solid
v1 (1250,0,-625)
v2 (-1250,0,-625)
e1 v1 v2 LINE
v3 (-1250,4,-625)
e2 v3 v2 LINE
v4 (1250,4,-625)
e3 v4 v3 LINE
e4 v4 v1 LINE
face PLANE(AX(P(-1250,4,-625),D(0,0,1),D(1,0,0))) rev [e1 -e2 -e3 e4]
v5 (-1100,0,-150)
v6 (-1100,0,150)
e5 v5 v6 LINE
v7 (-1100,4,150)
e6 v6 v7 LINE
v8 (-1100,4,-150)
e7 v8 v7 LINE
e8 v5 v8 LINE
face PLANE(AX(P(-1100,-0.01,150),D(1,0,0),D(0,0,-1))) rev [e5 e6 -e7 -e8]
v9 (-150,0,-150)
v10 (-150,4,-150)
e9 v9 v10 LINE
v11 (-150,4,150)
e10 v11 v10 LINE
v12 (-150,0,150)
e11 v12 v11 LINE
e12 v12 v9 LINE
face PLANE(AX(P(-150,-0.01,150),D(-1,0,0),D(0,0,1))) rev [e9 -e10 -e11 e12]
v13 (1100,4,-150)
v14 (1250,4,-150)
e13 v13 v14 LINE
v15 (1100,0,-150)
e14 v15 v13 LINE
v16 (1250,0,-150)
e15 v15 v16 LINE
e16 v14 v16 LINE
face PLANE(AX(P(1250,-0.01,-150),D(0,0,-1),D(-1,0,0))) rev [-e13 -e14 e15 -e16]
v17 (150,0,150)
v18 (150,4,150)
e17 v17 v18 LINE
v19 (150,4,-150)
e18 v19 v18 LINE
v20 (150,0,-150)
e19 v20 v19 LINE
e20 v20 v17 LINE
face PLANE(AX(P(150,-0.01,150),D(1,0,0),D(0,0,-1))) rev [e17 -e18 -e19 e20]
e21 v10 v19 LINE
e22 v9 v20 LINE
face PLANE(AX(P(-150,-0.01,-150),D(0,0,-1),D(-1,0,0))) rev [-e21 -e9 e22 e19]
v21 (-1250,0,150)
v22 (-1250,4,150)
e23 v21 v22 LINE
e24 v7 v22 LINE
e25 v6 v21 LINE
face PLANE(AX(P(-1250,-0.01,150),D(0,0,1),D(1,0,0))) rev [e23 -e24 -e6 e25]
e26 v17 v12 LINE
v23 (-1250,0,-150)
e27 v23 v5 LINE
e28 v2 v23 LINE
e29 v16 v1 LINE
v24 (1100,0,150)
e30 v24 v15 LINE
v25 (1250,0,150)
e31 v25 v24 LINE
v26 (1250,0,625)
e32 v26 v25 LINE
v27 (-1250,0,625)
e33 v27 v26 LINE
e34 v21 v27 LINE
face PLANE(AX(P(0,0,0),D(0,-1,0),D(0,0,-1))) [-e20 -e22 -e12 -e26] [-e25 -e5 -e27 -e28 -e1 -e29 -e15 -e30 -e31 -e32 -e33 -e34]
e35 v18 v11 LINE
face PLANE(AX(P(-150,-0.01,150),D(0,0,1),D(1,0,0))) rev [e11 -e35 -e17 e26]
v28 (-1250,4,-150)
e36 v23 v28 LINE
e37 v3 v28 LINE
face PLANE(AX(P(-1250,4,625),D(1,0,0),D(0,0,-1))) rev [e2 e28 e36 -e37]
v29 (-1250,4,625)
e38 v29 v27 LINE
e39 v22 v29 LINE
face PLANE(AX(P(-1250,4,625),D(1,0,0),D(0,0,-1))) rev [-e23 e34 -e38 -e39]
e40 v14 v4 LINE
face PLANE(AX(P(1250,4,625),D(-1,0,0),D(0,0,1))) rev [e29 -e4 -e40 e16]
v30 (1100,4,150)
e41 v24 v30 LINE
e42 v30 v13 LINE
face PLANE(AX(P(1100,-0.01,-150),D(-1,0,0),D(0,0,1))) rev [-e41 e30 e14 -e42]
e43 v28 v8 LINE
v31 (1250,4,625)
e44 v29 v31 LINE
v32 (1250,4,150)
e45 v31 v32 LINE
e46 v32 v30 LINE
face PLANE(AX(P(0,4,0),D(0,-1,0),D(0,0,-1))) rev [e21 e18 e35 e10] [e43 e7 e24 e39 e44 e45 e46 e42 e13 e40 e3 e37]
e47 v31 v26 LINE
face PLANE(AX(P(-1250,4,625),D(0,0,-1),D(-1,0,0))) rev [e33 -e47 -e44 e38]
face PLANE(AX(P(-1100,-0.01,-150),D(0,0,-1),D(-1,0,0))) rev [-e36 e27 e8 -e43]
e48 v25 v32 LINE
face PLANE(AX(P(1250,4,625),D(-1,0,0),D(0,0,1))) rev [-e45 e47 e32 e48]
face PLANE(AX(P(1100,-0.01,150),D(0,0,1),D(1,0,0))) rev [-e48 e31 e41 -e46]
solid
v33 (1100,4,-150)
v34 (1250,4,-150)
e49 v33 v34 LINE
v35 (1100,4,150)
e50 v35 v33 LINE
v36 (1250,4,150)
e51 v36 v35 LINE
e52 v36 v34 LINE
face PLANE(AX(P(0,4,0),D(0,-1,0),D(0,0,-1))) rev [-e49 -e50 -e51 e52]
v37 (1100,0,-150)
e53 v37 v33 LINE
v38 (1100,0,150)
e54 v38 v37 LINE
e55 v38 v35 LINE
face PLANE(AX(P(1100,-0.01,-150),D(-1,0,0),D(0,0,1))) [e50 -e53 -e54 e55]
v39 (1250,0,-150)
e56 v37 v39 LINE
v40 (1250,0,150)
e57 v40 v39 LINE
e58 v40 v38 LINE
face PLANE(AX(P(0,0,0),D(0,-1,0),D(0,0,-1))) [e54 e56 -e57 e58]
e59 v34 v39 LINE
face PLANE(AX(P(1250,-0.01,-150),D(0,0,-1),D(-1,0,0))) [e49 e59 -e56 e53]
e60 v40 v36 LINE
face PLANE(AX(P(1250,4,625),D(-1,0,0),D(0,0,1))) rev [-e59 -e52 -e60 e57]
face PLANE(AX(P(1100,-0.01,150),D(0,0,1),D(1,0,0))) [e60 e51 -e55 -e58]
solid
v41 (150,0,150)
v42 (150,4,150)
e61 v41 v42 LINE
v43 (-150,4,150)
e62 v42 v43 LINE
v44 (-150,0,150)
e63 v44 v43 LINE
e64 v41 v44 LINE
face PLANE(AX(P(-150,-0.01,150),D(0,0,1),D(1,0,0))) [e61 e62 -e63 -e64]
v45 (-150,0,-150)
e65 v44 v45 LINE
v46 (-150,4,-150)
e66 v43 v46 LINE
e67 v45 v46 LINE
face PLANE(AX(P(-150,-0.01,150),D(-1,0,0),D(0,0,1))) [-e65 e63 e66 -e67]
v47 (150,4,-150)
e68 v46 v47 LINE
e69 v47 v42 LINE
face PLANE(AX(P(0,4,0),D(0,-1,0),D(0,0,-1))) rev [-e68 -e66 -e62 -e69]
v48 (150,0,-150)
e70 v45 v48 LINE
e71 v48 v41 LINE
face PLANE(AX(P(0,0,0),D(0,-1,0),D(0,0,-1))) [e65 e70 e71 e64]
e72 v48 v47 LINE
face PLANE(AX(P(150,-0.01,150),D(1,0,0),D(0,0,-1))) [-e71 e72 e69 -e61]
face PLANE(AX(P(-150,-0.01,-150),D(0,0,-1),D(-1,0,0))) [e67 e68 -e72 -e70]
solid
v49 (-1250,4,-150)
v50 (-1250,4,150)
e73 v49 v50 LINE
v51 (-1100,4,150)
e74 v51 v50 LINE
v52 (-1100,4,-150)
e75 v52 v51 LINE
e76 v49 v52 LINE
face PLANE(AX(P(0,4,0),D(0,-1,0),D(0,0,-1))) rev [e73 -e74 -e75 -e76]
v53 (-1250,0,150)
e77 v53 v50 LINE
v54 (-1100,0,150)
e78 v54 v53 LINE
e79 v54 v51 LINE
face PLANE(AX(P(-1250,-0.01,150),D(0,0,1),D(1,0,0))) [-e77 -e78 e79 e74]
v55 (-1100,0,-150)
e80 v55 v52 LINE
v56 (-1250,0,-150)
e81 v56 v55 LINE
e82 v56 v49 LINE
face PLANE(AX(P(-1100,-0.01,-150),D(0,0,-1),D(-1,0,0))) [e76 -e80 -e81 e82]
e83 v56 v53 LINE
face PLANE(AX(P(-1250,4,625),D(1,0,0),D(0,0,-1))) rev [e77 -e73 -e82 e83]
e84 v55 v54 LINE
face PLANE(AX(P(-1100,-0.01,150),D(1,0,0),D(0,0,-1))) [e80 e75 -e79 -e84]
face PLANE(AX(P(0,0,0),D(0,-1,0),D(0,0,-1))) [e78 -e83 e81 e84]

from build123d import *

# Parameters (mm, degrees)
SKETCH1_W              = 2500
SKETCH1_H              = 1250
BOSS_EXTRUDE1_DEPTH    = 4
SPLIT1_SURFACE_1_BACK  = 2796.088
SPLIT1_SURFACE_1_DEPTH = 5592.176
SPLIT1_SURFACE_2_BACK  = 2796.088
SPLIT1_SURFACE_2_DEPTH = 5592.176
SPLIT2_START           = -150
SPLIT2_OUTLINE_W       = 150
SPLIT2_OUTLINE_H       = 4
SPLIT2_DEPTH           = 300
SPLIT2_2_OUTLINE_W     = 150
SPLIT2_2_OUTLINE_H     = 4
SPLIT2_2_DEPTH         = 300
SPLIT2_3_OUTLINE_W     = 150
SPLIT2_3_OUTLINE_H     = 4
SPLIT2_3_DEPTH         = 300


# Read off the part's stored shape, not the designer's step: Split2
with BuildPart() as part:
    # Sketch1 → Boss-Extrude1 (new body)
    with BuildSketch(Plane(origin=(0, 0, 0), x_dir=(1, 0, 0), z_dir=(0, 1, 0))):
        Rectangle(SKETCH1_W, SKETCH1_H)
    extrude(amount=BOSS_EXTRUDE1_DEPTH)


with BuildPart() as body_2:
    # Split1: the piece behind the surface
    add(part.part)
    # Split1 surface: a surface, the sketch's curves swept straight by 5592.176 mm
    with BuildLine(Plane(origin=(0, 4, 0), x_dir=(1, 0, 0), z_dir=(0, 1, 0)).offset(-SPLIT1_SURFACE_1_BACK), mode=Mode.PRIVATE) as split1_surface_1_path:
        Line((-150, -150), (150, -150))
        Line((150, -150), (150, 150))
        Line((150, 150), (-150, 150))
        Line((-150, 150), (-150, -150))
    split1_surface_1 = Shell.extrude(split1_surface_1_path.wire(), (0 * SPLIT1_SURFACE_1_DEPTH, 1 * SPLIT1_SURFACE_1_DEPTH, 0 * SPLIT1_SURFACE_1_DEPTH))
    split(bisect_by=split1_surface_1, keep=Keep.BOTTOM)

    # Split2 2 outline → Split2 2 (cut)
    with BuildSketch(Plane.XY.offset(SPLIT2_START)):
        with Locations((-1175, 2)):
            Rectangle(SPLIT2_2_OUTLINE_W, SPLIT2_2_OUTLINE_H)
        with Locations((1175, 2)):
            Rectangle(SPLIT2_2_OUTLINE_W, SPLIT2_2_OUTLINE_H)
    extrude(amount=SPLIT2_2_DEPTH, mode=Mode.SUBTRACT)


with BuildPart() as part_1:
    add(part.part)

    # Split1: split by a surface, the side it looks to stays
    # Split1 surface: a surface, the sketch's curves swept straight by 5592.176 mm
    with BuildLine(Plane(origin=(0, 4, 0), x_dir=(1, 0, 0), z_dir=(0, 1, 0)).offset(-SPLIT1_SURFACE_2_BACK), mode=Mode.PRIVATE) as split1_surface_2_path:
        Line((-150, -150), (150, -150))
        Line((150, -150), (150, 150))
        Line((150, 150), (-150, 150))
        Line((-150, 150), (-150, -150))
    split1_surface_2 = Shell.extrude(split1_surface_2_path.wire(), (0 * SPLIT1_SURFACE_2_DEPTH, 1 * SPLIT1_SURFACE_2_DEPTH, 0 * SPLIT1_SURFACE_2_DEPTH))
    split(bisect_by=split1_surface_2, keep=Keep.TOP)


with BuildPart() as body_3:
    # Split2 outline → Split2 (new body)
    with BuildSketch(Plane.XY.offset(SPLIT2_START)):
        with Locations((-1175, 2)):
            Rectangle(SPLIT2_OUTLINE_W, SPLIT2_OUTLINE_H)
    extrude(amount=SPLIT2_DEPTH)


with BuildPart() as body_4:
    # Split2 3 outline → Split2 3 (new body)
    with BuildSketch(Plane.XY.offset(SPLIT2_START)):
        with Locations((1175, 2)):
            Rectangle(SPLIT2_3_OUTLINE_W, SPLIT2_3_OUTLINE_H)
    extrude(amount=SPLIT2_3_DEPTH)


solid = Compound([body_2.part, part_1.part, body_3.part, body_4.part])
